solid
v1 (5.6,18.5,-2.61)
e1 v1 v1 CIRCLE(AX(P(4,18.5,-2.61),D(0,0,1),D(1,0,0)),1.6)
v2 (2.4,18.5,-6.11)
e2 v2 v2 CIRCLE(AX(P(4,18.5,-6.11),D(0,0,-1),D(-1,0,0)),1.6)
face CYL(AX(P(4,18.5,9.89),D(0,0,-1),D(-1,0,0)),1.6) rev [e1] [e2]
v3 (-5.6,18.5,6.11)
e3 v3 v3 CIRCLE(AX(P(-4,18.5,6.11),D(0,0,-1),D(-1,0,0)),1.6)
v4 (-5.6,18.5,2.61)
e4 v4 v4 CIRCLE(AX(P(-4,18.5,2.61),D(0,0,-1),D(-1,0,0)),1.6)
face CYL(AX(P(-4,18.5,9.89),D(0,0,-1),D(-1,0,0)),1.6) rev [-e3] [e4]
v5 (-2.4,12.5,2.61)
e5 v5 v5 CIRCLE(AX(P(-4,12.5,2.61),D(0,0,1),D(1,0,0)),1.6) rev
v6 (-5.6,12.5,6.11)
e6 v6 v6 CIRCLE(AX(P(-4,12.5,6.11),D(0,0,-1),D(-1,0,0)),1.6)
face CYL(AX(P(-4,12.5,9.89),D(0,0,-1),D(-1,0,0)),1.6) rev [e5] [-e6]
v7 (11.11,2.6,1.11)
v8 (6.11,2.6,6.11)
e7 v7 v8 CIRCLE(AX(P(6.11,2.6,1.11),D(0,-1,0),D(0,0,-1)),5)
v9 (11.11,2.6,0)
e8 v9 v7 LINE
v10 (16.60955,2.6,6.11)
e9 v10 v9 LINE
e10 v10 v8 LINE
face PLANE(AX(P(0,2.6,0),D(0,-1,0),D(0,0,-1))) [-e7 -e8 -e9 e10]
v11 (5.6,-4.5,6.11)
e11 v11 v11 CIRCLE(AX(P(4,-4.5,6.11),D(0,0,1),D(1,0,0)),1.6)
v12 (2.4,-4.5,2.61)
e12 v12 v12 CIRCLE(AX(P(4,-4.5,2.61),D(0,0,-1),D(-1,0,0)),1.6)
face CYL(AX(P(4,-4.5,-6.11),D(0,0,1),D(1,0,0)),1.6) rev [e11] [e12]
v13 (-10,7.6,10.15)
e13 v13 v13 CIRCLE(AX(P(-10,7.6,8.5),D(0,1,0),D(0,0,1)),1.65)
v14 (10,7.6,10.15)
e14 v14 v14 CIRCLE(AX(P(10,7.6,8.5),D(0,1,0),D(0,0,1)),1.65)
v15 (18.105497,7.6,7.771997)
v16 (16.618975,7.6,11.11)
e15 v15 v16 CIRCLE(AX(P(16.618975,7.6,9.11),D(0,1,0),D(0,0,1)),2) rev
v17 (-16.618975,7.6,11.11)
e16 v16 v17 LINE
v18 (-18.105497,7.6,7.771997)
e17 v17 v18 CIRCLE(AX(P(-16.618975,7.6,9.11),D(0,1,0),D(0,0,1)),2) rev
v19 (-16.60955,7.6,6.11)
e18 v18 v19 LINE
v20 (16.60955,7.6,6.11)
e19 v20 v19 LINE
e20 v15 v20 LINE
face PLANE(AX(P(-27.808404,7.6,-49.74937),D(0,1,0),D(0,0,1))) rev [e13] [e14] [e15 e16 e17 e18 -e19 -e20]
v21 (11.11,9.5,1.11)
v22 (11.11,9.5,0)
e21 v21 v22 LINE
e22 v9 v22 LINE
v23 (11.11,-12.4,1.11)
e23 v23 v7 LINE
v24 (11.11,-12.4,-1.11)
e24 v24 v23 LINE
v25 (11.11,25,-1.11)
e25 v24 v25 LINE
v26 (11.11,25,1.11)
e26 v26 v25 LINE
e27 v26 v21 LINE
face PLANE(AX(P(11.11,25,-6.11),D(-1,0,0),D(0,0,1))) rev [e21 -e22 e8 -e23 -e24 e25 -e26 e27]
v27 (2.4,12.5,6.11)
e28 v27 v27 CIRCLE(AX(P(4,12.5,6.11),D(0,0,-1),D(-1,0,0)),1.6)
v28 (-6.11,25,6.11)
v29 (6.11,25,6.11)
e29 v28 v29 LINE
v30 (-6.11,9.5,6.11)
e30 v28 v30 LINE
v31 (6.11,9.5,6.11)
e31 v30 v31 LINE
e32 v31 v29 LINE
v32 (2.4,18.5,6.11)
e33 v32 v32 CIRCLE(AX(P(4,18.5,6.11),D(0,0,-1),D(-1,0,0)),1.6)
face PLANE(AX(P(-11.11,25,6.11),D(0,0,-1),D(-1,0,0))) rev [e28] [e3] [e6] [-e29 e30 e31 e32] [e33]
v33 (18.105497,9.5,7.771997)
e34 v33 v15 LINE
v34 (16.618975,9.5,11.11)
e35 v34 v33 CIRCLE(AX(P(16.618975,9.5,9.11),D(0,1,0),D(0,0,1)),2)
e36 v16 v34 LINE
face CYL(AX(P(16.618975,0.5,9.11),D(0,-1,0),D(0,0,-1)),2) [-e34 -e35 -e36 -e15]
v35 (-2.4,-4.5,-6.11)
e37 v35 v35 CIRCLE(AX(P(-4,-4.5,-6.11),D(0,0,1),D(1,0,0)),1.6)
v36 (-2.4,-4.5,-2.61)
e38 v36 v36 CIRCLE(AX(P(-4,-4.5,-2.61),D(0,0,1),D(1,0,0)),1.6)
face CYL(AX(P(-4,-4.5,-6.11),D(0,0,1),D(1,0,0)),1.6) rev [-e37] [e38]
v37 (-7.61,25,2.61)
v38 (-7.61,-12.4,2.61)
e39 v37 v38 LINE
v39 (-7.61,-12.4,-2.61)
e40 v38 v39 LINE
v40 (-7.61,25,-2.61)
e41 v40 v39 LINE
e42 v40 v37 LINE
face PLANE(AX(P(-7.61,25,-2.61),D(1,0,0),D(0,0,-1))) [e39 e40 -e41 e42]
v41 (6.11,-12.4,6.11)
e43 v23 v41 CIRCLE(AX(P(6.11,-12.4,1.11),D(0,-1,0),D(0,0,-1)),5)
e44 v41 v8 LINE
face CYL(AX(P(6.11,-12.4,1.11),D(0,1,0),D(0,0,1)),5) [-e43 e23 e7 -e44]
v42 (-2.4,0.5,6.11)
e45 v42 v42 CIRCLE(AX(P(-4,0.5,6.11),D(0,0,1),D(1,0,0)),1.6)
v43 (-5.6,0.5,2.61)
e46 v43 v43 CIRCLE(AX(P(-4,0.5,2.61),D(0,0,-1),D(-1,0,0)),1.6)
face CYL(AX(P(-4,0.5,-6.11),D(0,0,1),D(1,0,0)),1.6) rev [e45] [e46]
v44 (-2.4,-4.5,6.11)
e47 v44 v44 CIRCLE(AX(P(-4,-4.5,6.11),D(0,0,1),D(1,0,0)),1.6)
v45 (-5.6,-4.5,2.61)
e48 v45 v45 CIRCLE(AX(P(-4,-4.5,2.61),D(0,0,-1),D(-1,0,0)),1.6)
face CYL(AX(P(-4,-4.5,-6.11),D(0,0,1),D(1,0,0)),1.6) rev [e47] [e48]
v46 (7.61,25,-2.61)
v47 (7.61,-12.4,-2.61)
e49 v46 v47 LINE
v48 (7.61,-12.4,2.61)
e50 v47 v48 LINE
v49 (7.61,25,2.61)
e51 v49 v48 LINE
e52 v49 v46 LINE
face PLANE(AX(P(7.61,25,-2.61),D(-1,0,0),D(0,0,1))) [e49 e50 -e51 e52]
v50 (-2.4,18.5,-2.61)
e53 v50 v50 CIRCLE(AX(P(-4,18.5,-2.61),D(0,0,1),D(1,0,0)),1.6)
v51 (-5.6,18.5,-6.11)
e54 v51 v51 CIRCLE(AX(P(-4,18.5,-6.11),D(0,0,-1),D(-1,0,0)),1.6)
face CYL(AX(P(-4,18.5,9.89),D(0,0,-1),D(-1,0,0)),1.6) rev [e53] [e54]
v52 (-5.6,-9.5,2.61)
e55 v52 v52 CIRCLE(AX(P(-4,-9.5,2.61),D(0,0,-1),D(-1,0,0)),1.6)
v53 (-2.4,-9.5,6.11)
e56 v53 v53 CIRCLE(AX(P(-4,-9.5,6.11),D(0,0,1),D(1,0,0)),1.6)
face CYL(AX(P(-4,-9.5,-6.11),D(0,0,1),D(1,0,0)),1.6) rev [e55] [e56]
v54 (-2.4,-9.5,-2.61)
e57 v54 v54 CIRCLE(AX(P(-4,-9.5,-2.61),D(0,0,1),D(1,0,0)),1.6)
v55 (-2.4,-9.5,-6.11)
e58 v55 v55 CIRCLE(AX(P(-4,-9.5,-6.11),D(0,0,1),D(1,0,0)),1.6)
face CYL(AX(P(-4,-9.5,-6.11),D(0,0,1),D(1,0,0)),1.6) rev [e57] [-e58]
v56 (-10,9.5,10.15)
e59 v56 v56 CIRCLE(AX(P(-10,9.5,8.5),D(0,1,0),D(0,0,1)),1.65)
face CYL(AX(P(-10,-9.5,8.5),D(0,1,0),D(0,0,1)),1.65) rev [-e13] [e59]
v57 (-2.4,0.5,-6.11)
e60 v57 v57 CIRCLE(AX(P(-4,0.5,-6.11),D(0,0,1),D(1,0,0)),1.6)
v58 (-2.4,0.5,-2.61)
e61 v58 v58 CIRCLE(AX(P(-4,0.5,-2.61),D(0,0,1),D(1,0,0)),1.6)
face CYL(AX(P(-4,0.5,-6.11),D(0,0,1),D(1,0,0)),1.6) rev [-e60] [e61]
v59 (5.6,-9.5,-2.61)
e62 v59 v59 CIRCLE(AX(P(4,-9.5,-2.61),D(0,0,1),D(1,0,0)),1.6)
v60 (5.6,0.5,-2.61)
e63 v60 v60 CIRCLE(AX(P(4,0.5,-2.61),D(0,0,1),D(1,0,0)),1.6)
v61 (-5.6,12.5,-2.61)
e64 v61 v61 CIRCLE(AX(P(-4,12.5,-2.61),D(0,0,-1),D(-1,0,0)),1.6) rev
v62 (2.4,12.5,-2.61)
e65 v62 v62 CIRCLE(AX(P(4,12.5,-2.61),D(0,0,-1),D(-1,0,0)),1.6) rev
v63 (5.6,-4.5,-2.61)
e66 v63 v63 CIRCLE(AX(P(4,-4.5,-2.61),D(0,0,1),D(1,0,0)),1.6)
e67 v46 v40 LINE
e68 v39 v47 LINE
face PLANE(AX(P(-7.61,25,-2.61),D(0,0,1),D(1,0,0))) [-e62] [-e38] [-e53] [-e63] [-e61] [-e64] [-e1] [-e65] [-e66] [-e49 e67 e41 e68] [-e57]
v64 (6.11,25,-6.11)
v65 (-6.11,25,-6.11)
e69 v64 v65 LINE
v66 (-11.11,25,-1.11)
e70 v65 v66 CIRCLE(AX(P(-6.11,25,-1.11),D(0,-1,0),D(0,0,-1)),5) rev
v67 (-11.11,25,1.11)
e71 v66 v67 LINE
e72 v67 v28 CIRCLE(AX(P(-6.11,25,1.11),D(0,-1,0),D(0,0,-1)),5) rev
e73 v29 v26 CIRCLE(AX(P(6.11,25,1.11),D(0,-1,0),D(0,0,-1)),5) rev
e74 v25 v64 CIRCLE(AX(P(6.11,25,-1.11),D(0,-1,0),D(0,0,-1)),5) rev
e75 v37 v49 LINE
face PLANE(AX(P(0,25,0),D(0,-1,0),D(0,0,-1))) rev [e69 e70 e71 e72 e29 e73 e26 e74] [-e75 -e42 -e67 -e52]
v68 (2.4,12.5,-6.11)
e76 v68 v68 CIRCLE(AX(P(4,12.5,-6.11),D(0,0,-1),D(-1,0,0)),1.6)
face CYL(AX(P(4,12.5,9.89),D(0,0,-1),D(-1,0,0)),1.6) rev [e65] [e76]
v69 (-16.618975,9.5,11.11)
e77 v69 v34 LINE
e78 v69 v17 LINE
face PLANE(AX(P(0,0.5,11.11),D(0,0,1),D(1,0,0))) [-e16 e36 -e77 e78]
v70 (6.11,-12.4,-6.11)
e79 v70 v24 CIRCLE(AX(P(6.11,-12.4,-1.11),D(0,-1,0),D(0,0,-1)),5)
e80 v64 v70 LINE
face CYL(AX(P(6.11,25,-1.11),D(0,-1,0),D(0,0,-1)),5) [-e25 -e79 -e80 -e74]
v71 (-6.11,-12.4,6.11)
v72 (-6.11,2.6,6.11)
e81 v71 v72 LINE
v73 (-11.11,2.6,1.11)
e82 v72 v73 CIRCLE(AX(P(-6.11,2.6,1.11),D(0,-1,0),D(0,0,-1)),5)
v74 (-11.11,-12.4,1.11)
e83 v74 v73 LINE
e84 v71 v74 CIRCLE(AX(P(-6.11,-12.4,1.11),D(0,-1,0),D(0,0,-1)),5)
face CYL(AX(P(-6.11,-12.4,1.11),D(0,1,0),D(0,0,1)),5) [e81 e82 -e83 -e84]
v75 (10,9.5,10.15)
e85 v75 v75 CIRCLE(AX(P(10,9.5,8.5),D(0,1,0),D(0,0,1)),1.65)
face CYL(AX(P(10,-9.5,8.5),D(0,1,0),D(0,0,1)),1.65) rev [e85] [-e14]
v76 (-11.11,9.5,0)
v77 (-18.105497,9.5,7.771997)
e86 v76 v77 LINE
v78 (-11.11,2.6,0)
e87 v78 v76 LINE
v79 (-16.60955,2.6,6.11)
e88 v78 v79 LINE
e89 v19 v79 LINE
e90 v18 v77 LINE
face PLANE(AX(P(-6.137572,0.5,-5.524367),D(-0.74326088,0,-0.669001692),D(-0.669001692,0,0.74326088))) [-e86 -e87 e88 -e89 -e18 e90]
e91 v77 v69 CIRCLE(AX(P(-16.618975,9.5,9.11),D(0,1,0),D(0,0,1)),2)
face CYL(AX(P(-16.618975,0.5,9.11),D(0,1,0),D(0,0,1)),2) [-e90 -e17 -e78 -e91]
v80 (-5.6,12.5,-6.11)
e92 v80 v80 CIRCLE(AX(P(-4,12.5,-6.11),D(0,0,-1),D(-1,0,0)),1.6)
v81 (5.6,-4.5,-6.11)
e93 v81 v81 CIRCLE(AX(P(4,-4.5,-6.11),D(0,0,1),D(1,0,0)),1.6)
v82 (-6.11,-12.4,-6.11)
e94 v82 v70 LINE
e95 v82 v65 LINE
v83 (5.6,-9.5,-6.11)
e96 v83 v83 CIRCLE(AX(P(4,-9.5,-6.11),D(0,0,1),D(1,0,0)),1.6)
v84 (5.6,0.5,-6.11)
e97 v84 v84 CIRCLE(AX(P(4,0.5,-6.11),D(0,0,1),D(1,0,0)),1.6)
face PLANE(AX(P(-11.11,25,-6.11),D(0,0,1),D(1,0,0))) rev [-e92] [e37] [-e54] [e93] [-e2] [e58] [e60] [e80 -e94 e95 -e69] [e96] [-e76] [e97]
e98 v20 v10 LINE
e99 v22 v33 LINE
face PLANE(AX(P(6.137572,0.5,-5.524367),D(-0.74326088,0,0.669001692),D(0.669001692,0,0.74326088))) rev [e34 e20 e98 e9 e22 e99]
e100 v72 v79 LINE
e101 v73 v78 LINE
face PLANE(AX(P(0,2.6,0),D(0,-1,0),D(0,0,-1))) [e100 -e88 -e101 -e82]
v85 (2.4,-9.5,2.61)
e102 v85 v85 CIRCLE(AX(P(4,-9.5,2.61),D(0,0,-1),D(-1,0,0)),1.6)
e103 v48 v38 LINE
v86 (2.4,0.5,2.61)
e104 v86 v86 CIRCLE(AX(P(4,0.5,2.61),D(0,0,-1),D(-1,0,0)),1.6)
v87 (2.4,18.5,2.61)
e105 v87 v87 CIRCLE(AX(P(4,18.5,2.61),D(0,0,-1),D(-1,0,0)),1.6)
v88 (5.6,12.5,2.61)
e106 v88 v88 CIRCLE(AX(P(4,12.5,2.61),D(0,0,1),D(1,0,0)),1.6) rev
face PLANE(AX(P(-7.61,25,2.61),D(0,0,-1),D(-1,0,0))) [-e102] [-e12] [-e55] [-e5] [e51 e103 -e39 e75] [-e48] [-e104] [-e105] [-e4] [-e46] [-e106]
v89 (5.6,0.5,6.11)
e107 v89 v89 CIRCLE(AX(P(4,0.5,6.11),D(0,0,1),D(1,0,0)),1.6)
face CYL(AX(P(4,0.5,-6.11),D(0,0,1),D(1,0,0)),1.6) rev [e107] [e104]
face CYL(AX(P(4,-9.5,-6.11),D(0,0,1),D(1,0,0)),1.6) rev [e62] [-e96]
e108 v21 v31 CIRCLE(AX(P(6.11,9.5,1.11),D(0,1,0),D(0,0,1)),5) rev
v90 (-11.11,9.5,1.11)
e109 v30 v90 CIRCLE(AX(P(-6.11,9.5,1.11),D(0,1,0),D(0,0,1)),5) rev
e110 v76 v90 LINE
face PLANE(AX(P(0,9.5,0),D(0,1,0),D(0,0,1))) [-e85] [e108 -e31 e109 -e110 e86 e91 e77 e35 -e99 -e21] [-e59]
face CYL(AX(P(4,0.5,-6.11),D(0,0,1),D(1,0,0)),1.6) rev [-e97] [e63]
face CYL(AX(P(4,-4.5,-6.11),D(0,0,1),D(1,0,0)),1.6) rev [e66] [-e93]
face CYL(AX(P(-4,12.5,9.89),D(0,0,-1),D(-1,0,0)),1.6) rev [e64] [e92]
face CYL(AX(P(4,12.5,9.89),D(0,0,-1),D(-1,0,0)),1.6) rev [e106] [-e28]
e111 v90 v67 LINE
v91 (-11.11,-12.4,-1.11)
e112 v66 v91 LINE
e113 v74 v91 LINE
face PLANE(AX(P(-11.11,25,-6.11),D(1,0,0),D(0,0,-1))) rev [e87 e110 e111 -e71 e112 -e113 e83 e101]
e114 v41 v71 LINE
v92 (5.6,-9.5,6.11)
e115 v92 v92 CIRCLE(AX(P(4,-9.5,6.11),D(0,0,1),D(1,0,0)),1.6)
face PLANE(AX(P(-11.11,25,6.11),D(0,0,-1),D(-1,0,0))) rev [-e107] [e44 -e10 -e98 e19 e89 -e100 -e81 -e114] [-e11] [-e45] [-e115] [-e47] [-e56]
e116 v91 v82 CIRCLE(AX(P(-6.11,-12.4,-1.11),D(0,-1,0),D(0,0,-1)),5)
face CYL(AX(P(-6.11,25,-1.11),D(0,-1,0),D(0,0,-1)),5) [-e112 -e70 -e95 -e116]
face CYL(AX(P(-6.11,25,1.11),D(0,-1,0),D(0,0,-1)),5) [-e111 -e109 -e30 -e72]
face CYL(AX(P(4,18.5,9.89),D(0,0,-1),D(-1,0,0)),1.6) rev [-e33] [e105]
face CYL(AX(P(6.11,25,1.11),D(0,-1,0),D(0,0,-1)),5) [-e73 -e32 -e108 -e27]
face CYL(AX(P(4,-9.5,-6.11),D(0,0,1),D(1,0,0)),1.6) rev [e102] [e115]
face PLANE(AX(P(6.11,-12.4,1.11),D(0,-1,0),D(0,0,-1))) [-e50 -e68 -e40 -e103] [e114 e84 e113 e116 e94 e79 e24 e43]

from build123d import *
from build123d.topology import SkipClean

# Parameters (mm, degrees)
SKETCH_1_W                     = 22.22
SKETCH_1_H                     = 12.22
SKETCH_1_W_2                   = 15.22
SKETCH_1_H_2                   = 5.22
EXTRUDE_1_DEPTH                = 25
EXTRUDE_START                  = -2
SKETCH_3_W                     = 15.22
SKETCH_3_H                     = 5.22
EXTRUDE_2_DEPTH                = 9
SKETCH_4_W                     = 54.706051552
SKETCH_4_H                     = 5.2
CUT_EXTRUDE_1_DEPTH            = 5
SKETCH_5_W                     = 55.616807128
SKETCH_5_H                     = 5.2
CUT_EXTRUDE_2_DEPTH            = 5
FILLET_1_R                     = 2
PATTERN_LINEAR_1_COUNT         = 2
PATTERN_LINEAR_1_PITCH         = 10
FILLET_1_OF_PATTERN_LINEAR_1_R = 2
SKETCH_7_R                     = 1.65
CUT_EXTRUDE_5_DEPTH            = 29
CUT_EXTRUDE_START              = 1
CUT_EXTRUDE_7_OUTLINE_R        = 1.65
CUT_EXTRUDE_7_DEPTH            = 9
SKETCH_9_W                     = 15.22
SKETCH_9_H                     = 5.22
EXTRUDE_3_DEPTH                = 15
CUT_EXTRUDE_8_DEPTH            = 18
FILLET_2_R                     = 5
SKETCH_12_R                    = 1.6
CUT_EXTRUDE_9_DEPTH            = 16
SKETCH_13_R                    = 1.65
EXTRUDE_4_DEPTH                = 0.5
CUT_EXTRUDE_START_2            = -2.6
CUT_EXTRUDE_10_DEPTH           = 2.6
SKETCH_15_W                    = 15.22
SKETCH_15_H                    = 5.22
CUT_EXTRUDE_11_DEPTH           = 25.977155973
SKETCH_16_W                    = 15.22
SKETCH_16_H                    = 5.22
EXTRUDE_5_DEPTH                = 15
SKETCH_17_R                    = 1.6
CUT_EXTRUDE_12_DEPTH           = 34.48125775


# Read off the part's stored shape, not the designer's step: 切除-拉伸7
with BuildPart() as part:
    # 草图1 → 凸台-拉伸1 (new body)
    with BuildSketch(Plane(origin=(0, 0, 0), x_dir=(1, 0, 0), z_dir=(0, 1, 0))):
        Rectangle(SKETCH_1_W, SKETCH_1_H)
        Rectangle(SKETCH_1_W_2, SKETCH_1_H_2, mode=Mode.SUBTRACT)
    extrude(amount=EXTRUDE_1_DEPTH)

    # 草图3 → 凸台-拉伸2 (add)
    with BuildSketch(Plane(origin=(0, 12.5, 0), x_dir=(1, 0, 0), z_dir=(0, 1, 0)).offset(EXTRUDE_START)):
        Polygon((11.11, 0), (21.11, -11.11), (-21.11, -11.11), (-11.11, 0), (-21.11, 11.11), (21.11, 11.11), align=None)
        Rectangle(SKETCH_3_W, SKETCH_3_H, mode=Mode.SUBTRACT)
    extrude_2 = extrude(amount=EXTRUDE_2_DEPTH)

    # 草图4 → 切除-拉伸1 (cut)
    with BuildSketch(Plane(origin=(0, 0, -11.11), x_dir=(-1, 0, 0), z_dir=(0, 0, -1))):
        with Locations((0, 15)):
            Rectangle(SKETCH_4_W, SKETCH_4_H)
    cut_extrude_1 = extrude(amount=-CUT_EXTRUDE_1_DEPTH, mode=Mode.SUBTRACT)

    # 草图5 → 切除-拉伸2 (cut)
    with BuildSketch(Plane.XY.offset(11.11)):
        with Locations((0, 15)):
            Rectangle(SKETCH_5_W, SKETCH_5_H)
    cut_extrude_2 = extrude(amount=-CUT_EXTRUDE_2_DEPTH, mode=Mode.SUBTRACT)

    # 圆角1
    fillet_1_edges = [part.edges().sort_by_distance(p)[0] for p in [
        (-21.11, 18.55, 11.11),
        (21.11, 18.55, 11.11),
        (21.11, 11.45, 11.11),
        (-21.11, 11.45, 11.11),
        (-21.11, 11.45, -11.11),
        (21.11, 11.45, -11.11),
        (21.11, 18.55, -11.11),
        (-21.11, 18.55, -11.11),
    ]]
    fillet(fillet_1_edges, radius=FILLET_1_R)

    # 阵列(线性)1: 凸台-拉伸2, 切除-拉伸1, 切除-拉伸2 ×2
    with Locations(*[(0, -i * PATTERN_LINEAR_1_PITCH, 0) for i in range(1, PATTERN_LINEAR_1_COUNT)]):
        add(extrude_2)
        add(cut_extrude_1, mode=Mode.SUBTRACT)
        add(cut_extrude_2, mode=Mode.SUBTRACT)

    # 圆角1 of 阵列(线性)1
    fillet_1_of_pattern_linear_1_edges = [part.edges().sort_by_distance(p)[0] for p in [
        (-21.11, 8.55, 11.11),
        (21.11, 8.55, 11.11),
        (21.11, 1.45, 11.11),
        (-21.11, 1.45, 11.11),
        (-21.11, 1.45, -11.11),
        (21.11, 1.45, -11.11),
        (21.11, 8.55, -11.11),
        (-21.11, 8.55, -11.11),
    ]]
    fillet(fillet_1_of_pattern_linear_1_edges, radius=FILLET_1_OF_PATTERN_LINEAR_1_R)

    # 草图7 → 切除-拉伸5 (cut)
    with BuildSketch(Plane(origin=(0, 19.5, 0), x_dir=(1, 0, 0), z_dir=(0, 1, 0))):
        with Locations(Location((-10, 8.5, 0), (0, 0, 270))):
            Circle(SKETCH_7_R)
        with Locations(Location((10, 8.5, 0), (0, 0, 270))):
            Circle(SKETCH_7_R)
        with Locations(Location((10, -8.5, 0), (0, 0, 270))):
            Circle(SKETCH_7_R)
        with Locations(Location((-10, -8.5, 0), (0, 0, 270))):
            Circle(SKETCH_7_R)
    extrude(amount=-CUT_EXTRUDE_5_DEPTH, mode=Mode.SUBTRACT)

    # 切除-拉伸7 outline → 切除-拉伸7 (cut)
    # profile 1 of 2: a face of its own
    with BuildSketch(Plane(origin=(0, 9.5, 0), x_dir=(1, 0, 0), z_dir=(0, 1, 0)).offset(CUT_EXTRUDE_START)):
        with BuildLine():
            Line((-18.105496504, 7.771996616), (-11.11, 0))
            Line((-11.11, 0), (-11.11, 6.11))
            Line((-11.11, 6.11), (11.11, 6.11))
            Line((11.11, 6.11), (11.11, 0))
            Line((11.11, 0), (18.105496504, 7.771996616))
            ThreePointArc((18.105496504, 7.771996616), (18.4459951, 9.923631744), (16.618974744, 11.11))
            Line((16.618974744, 11.11), (-16.618974744, 11.11))
            ThreePointArc((-16.618974744, 11.11), (-18.4459951, 9.923631744), (-18.105496504, 7.771996616))
        make_face()
        with Locations((-10, 8.5)):
            Circle(CUT_EXTRUDE_7_OUTLINE_R, mode=Mode.SUBTRACT)
        with Locations((10, 8.5)):
            Circle(CUT_EXTRUDE_7_OUTLINE_R, mode=Mode.SUBTRACT)
    # profile 2 of 2: a face of its own
    with BuildSketch(Plane(origin=(0, 9.5, 0), x_dir=(1, 0, 0), z_dir=(0, 1, 0)).offset(CUT_EXTRUDE_START)):
        with BuildLine():
            Line((-11.11, -6.11), (-11.11, 0))
            Line((-11.11, 0), (-18.105496504, -7.771996616))
            ThreePointArc((-18.105496504, -7.771996616), (-18.4459951, -9.923631744), (-16.618974744, -11.11))
            Line((-16.618974744, -11.11), (16.618974744, -11.11))
            ThreePointArc((16.618974744, -11.11), (18.4459951, -9.923631744), (18.105496504, -7.771996616))
            Line((18.105496504, -7.771996616), (11.11, 0))
            Line((11.11, 0), (11.11, -6.11))
            Line((11.11, -6.11), (-11.11, -6.11))
        make_face()
        with Locations((10, -8.5)):
            Circle(CUT_EXTRUDE_7_OUTLINE_R, mode=Mode.SUBTRACT)
        with Locations((-10, -8.5)):
            Circle(CUT_EXTRUDE_7_OUTLINE_R, mode=Mode.SUBTRACT)
    extrude(amount=CUT_EXTRUDE_7_DEPTH, mode=Mode.SUBTRACT)

    # 草图9 → 凸台-拉伸3 (add)
    with BuildSketch(Plane.XZ):
        Rectangle(SKETCH_9_W, SKETCH_9_H)
    extrude(amount=-EXTRUDE_3_DEPTH)

    # 草图11 → 切除-拉伸8 (cut)
    with BuildSketch(Plane(origin=(0, 9.5, 0), x_dir=(1, 0, 0), z_dir=(0, 1, 0))):
        with BuildLine():
            Line((11.11, 0), (18.105496504, 7.771996616))
            ThreePointArc((18.105496504, 7.771996616), (18.4459951, 9.923631744), (16.618974744, 11.11))
            Line((16.618974744, 11.11), (-16.618974744, 11.11))
            ThreePointArc((-16.618974744, 11.11), (-18.4459951, 9.923631744), (-18.105496504, 7.771996616))
            Line((-18.105496504, 7.771996616), (-11.11, 0))
            Line((-11.11, 0), (-11.11, 6.11))
            Line((-11.11, 6.11), (11.11, 6.11))
            Line((11.11, 6.11), (11.11, 0))
        make_face()
    extrude(amount=-CUT_EXTRUDE_8_DEPTH, mode=Mode.SUBTRACT)

    # 圆角2
    fillet_2_edges = [part.edges().sort_by_distance(p)[0] for p in [
        (11.11, 12.5, -6.11),
        (11.11, 17.25, 6.11),
        (-11.11, 17.25, 6.11),
        (-11.11, 12.5, -6.11),
    ]]
    fillet(fillet_2_edges, radius=FILLET_2_R)

    # 草图12 → 切除-拉伸9 (cut)
    with BuildSketch(Plane(origin=(0, 0, -6.11), x_dir=(-1, 0, 0), z_dir=(0, 0, -1))):
        with Locations((-4, 18.5)):
            Circle(SKETCH_12_R)
        with Locations((4, 18.5)):
            Circle(SKETCH_12_R)
        with Locations((-4, 12.5)):
            Circle(SKETCH_12_R)
        with Locations((4, 12.5)):
            Circle(SKETCH_12_R)
    extrude(amount=-CUT_EXTRUDE_9_DEPTH, mode=Mode.SUBTRACT)

    # 草图13 → 凸台-拉伸4 (add)
    with SkipClean():  # the faces are left unmerged after this step: merging them gives an invalid solid
        with BuildSketch(Plane.XZ.offset(-0.5)):
            with BuildLine():
                Line((11.11, 0), (18.105496504, 7.771996616))
                ThreePointArc((18.105496504, 7.771996616), (18.4459951, 9.923631744), (16.618974744, 11.11))
                Line((16.618974744, 11.11), (-16.618974744, 11.11))
                ThreePointArc((-16.618974744, 11.11), (-18.4459951, 9.923631744), (-18.105496504, 7.771996616))
                Line((-18.105496504, 7.771996616), (-11.11, 0))
                Line((-11.11, 0), (-11.11, 6.11))
                Line((-11.11, 6.11), (11.11, 6.11))
                Line((11.11, 6.11), (11.11, 0))
            make_face()
            with Locations(Location((-10, 8.5, 0), (0, 0, 270))):
                Circle(SKETCH_13_R, mode=Mode.SUBTRACT)
            with Locations(Location((10, 8.5, 0), (0, 0, 270))):
                Circle(SKETCH_13_R, mode=Mode.SUBTRACT)
        extrude(amount=EXTRUDE_4_DEPTH)

    # 草图14 → 切除-拉伸10 (cut)
    with BuildSketch(Plane.XZ.offset(CUT_EXTRUDE_START_2)):
        with BuildLine():
            Line((-6.11, -6.11), (6.11, -6.11))
            ThreePointArc((6.11, -6.11), (9.645533906, -4.645533906), (11.11, -1.11))
            Line((11.11, -1.11), (11.11, 0))
            Line((11.11, 0), (18.105496504, 7.771996616))
            ThreePointArc((18.105496504, 7.771996616), (18.4459951, 9.923631744), (16.618974744, 11.11))
            Line((16.618974744, 11.11), (-16.618974744, 11.11))
            ThreePointArc((-16.618974744, 11.11), (-18.4459951, 9.923631744), (-18.105496504, 7.771996616))
            Line((-18.105496504, 7.771996616), (-11.11, 0))
            Line((-11.11, 0), (-11.11, -1.11))
            ThreePointArc((-11.11, -1.11), (-9.645533906, -4.645533906), (-6.11, -6.11))
        make_face()
    extrude(amount=CUT_EXTRUDE_10_DEPTH, mode=Mode.SUBTRACT)

    # 草图15 → 切除-拉伸11 (cut, through all)
    with BuildSketch(Plane(origin=(0, 15, 0), x_dir=(1, 0, 0), z_dir=(0, 1, 0))):
        Rectangle(SKETCH_15_W, SKETCH_15_H)
    extrude(amount=-CUT_EXTRUDE_11_DEPTH, mode=Mode.SUBTRACT)

    # 草图16 → 凸台-拉伸5 (add)
    with BuildSketch(Plane.XZ.offset(-2.6)):
        with BuildLine():
            Line((11.11, -1.11), (11.11, 1.11))
            ThreePointArc((11.11, 1.11), (9.645533906, 4.645533906), (6.11, 6.11))
            Line((6.11, 6.11), (-6.11, 6.11))
            ThreePointArc((-6.11, 6.11), (-9.645533906, 4.645533906), (-11.11, 1.11))
            Line((-11.11, 1.11), (-11.11, -1.11))
            ThreePointArc((-11.11, -1.11), (-9.645533906, -4.645533906), (-6.11, -6.11))
            Line((-6.11, -6.11), (6.11, -6.11))
            ThreePointArc((6.11, -6.11), (9.645533906, -4.645533906), (11.11, -1.11))
        make_face()
        Rectangle(SKETCH_16_W, SKETCH_16_H, mode=Mode.SUBTRACT)
    extrude(amount=EXTRUDE_5_DEPTH)

    # 草图17 → 切除-拉伸12 (cut, through all)
    with BuildSketch(Plane.XY.offset(6.11)):
        with Locations(Location((-4, 12.5, 0), (0, 0, 180))):
            Circle(SKETCH_17_R)
        with Locations(Location((4, 12.5, 0), (0, 0, 180))):
            Circle(SKETCH_17_R)
        with Locations((-4, -9.5)):
            Circle(SKETCH_17_R)
        with Locations((4, -9.5)):
            Circle(SKETCH_17_R)
        with Locations((-4, -4.5)):
            Circle(SKETCH_17_R)
        with Locations((4, -4.5)):
            Circle(SKETCH_17_R)
        with Locations((-4, 0.5)):
            Circle(SKETCH_17_R)
        with Locations((4, 0.5)):
            Circle(SKETCH_17_R)
    extrude(amount=-CUT_EXTRUDE_12_DEPTH, mode=Mode.SUBTRACT)


solid = part.part
